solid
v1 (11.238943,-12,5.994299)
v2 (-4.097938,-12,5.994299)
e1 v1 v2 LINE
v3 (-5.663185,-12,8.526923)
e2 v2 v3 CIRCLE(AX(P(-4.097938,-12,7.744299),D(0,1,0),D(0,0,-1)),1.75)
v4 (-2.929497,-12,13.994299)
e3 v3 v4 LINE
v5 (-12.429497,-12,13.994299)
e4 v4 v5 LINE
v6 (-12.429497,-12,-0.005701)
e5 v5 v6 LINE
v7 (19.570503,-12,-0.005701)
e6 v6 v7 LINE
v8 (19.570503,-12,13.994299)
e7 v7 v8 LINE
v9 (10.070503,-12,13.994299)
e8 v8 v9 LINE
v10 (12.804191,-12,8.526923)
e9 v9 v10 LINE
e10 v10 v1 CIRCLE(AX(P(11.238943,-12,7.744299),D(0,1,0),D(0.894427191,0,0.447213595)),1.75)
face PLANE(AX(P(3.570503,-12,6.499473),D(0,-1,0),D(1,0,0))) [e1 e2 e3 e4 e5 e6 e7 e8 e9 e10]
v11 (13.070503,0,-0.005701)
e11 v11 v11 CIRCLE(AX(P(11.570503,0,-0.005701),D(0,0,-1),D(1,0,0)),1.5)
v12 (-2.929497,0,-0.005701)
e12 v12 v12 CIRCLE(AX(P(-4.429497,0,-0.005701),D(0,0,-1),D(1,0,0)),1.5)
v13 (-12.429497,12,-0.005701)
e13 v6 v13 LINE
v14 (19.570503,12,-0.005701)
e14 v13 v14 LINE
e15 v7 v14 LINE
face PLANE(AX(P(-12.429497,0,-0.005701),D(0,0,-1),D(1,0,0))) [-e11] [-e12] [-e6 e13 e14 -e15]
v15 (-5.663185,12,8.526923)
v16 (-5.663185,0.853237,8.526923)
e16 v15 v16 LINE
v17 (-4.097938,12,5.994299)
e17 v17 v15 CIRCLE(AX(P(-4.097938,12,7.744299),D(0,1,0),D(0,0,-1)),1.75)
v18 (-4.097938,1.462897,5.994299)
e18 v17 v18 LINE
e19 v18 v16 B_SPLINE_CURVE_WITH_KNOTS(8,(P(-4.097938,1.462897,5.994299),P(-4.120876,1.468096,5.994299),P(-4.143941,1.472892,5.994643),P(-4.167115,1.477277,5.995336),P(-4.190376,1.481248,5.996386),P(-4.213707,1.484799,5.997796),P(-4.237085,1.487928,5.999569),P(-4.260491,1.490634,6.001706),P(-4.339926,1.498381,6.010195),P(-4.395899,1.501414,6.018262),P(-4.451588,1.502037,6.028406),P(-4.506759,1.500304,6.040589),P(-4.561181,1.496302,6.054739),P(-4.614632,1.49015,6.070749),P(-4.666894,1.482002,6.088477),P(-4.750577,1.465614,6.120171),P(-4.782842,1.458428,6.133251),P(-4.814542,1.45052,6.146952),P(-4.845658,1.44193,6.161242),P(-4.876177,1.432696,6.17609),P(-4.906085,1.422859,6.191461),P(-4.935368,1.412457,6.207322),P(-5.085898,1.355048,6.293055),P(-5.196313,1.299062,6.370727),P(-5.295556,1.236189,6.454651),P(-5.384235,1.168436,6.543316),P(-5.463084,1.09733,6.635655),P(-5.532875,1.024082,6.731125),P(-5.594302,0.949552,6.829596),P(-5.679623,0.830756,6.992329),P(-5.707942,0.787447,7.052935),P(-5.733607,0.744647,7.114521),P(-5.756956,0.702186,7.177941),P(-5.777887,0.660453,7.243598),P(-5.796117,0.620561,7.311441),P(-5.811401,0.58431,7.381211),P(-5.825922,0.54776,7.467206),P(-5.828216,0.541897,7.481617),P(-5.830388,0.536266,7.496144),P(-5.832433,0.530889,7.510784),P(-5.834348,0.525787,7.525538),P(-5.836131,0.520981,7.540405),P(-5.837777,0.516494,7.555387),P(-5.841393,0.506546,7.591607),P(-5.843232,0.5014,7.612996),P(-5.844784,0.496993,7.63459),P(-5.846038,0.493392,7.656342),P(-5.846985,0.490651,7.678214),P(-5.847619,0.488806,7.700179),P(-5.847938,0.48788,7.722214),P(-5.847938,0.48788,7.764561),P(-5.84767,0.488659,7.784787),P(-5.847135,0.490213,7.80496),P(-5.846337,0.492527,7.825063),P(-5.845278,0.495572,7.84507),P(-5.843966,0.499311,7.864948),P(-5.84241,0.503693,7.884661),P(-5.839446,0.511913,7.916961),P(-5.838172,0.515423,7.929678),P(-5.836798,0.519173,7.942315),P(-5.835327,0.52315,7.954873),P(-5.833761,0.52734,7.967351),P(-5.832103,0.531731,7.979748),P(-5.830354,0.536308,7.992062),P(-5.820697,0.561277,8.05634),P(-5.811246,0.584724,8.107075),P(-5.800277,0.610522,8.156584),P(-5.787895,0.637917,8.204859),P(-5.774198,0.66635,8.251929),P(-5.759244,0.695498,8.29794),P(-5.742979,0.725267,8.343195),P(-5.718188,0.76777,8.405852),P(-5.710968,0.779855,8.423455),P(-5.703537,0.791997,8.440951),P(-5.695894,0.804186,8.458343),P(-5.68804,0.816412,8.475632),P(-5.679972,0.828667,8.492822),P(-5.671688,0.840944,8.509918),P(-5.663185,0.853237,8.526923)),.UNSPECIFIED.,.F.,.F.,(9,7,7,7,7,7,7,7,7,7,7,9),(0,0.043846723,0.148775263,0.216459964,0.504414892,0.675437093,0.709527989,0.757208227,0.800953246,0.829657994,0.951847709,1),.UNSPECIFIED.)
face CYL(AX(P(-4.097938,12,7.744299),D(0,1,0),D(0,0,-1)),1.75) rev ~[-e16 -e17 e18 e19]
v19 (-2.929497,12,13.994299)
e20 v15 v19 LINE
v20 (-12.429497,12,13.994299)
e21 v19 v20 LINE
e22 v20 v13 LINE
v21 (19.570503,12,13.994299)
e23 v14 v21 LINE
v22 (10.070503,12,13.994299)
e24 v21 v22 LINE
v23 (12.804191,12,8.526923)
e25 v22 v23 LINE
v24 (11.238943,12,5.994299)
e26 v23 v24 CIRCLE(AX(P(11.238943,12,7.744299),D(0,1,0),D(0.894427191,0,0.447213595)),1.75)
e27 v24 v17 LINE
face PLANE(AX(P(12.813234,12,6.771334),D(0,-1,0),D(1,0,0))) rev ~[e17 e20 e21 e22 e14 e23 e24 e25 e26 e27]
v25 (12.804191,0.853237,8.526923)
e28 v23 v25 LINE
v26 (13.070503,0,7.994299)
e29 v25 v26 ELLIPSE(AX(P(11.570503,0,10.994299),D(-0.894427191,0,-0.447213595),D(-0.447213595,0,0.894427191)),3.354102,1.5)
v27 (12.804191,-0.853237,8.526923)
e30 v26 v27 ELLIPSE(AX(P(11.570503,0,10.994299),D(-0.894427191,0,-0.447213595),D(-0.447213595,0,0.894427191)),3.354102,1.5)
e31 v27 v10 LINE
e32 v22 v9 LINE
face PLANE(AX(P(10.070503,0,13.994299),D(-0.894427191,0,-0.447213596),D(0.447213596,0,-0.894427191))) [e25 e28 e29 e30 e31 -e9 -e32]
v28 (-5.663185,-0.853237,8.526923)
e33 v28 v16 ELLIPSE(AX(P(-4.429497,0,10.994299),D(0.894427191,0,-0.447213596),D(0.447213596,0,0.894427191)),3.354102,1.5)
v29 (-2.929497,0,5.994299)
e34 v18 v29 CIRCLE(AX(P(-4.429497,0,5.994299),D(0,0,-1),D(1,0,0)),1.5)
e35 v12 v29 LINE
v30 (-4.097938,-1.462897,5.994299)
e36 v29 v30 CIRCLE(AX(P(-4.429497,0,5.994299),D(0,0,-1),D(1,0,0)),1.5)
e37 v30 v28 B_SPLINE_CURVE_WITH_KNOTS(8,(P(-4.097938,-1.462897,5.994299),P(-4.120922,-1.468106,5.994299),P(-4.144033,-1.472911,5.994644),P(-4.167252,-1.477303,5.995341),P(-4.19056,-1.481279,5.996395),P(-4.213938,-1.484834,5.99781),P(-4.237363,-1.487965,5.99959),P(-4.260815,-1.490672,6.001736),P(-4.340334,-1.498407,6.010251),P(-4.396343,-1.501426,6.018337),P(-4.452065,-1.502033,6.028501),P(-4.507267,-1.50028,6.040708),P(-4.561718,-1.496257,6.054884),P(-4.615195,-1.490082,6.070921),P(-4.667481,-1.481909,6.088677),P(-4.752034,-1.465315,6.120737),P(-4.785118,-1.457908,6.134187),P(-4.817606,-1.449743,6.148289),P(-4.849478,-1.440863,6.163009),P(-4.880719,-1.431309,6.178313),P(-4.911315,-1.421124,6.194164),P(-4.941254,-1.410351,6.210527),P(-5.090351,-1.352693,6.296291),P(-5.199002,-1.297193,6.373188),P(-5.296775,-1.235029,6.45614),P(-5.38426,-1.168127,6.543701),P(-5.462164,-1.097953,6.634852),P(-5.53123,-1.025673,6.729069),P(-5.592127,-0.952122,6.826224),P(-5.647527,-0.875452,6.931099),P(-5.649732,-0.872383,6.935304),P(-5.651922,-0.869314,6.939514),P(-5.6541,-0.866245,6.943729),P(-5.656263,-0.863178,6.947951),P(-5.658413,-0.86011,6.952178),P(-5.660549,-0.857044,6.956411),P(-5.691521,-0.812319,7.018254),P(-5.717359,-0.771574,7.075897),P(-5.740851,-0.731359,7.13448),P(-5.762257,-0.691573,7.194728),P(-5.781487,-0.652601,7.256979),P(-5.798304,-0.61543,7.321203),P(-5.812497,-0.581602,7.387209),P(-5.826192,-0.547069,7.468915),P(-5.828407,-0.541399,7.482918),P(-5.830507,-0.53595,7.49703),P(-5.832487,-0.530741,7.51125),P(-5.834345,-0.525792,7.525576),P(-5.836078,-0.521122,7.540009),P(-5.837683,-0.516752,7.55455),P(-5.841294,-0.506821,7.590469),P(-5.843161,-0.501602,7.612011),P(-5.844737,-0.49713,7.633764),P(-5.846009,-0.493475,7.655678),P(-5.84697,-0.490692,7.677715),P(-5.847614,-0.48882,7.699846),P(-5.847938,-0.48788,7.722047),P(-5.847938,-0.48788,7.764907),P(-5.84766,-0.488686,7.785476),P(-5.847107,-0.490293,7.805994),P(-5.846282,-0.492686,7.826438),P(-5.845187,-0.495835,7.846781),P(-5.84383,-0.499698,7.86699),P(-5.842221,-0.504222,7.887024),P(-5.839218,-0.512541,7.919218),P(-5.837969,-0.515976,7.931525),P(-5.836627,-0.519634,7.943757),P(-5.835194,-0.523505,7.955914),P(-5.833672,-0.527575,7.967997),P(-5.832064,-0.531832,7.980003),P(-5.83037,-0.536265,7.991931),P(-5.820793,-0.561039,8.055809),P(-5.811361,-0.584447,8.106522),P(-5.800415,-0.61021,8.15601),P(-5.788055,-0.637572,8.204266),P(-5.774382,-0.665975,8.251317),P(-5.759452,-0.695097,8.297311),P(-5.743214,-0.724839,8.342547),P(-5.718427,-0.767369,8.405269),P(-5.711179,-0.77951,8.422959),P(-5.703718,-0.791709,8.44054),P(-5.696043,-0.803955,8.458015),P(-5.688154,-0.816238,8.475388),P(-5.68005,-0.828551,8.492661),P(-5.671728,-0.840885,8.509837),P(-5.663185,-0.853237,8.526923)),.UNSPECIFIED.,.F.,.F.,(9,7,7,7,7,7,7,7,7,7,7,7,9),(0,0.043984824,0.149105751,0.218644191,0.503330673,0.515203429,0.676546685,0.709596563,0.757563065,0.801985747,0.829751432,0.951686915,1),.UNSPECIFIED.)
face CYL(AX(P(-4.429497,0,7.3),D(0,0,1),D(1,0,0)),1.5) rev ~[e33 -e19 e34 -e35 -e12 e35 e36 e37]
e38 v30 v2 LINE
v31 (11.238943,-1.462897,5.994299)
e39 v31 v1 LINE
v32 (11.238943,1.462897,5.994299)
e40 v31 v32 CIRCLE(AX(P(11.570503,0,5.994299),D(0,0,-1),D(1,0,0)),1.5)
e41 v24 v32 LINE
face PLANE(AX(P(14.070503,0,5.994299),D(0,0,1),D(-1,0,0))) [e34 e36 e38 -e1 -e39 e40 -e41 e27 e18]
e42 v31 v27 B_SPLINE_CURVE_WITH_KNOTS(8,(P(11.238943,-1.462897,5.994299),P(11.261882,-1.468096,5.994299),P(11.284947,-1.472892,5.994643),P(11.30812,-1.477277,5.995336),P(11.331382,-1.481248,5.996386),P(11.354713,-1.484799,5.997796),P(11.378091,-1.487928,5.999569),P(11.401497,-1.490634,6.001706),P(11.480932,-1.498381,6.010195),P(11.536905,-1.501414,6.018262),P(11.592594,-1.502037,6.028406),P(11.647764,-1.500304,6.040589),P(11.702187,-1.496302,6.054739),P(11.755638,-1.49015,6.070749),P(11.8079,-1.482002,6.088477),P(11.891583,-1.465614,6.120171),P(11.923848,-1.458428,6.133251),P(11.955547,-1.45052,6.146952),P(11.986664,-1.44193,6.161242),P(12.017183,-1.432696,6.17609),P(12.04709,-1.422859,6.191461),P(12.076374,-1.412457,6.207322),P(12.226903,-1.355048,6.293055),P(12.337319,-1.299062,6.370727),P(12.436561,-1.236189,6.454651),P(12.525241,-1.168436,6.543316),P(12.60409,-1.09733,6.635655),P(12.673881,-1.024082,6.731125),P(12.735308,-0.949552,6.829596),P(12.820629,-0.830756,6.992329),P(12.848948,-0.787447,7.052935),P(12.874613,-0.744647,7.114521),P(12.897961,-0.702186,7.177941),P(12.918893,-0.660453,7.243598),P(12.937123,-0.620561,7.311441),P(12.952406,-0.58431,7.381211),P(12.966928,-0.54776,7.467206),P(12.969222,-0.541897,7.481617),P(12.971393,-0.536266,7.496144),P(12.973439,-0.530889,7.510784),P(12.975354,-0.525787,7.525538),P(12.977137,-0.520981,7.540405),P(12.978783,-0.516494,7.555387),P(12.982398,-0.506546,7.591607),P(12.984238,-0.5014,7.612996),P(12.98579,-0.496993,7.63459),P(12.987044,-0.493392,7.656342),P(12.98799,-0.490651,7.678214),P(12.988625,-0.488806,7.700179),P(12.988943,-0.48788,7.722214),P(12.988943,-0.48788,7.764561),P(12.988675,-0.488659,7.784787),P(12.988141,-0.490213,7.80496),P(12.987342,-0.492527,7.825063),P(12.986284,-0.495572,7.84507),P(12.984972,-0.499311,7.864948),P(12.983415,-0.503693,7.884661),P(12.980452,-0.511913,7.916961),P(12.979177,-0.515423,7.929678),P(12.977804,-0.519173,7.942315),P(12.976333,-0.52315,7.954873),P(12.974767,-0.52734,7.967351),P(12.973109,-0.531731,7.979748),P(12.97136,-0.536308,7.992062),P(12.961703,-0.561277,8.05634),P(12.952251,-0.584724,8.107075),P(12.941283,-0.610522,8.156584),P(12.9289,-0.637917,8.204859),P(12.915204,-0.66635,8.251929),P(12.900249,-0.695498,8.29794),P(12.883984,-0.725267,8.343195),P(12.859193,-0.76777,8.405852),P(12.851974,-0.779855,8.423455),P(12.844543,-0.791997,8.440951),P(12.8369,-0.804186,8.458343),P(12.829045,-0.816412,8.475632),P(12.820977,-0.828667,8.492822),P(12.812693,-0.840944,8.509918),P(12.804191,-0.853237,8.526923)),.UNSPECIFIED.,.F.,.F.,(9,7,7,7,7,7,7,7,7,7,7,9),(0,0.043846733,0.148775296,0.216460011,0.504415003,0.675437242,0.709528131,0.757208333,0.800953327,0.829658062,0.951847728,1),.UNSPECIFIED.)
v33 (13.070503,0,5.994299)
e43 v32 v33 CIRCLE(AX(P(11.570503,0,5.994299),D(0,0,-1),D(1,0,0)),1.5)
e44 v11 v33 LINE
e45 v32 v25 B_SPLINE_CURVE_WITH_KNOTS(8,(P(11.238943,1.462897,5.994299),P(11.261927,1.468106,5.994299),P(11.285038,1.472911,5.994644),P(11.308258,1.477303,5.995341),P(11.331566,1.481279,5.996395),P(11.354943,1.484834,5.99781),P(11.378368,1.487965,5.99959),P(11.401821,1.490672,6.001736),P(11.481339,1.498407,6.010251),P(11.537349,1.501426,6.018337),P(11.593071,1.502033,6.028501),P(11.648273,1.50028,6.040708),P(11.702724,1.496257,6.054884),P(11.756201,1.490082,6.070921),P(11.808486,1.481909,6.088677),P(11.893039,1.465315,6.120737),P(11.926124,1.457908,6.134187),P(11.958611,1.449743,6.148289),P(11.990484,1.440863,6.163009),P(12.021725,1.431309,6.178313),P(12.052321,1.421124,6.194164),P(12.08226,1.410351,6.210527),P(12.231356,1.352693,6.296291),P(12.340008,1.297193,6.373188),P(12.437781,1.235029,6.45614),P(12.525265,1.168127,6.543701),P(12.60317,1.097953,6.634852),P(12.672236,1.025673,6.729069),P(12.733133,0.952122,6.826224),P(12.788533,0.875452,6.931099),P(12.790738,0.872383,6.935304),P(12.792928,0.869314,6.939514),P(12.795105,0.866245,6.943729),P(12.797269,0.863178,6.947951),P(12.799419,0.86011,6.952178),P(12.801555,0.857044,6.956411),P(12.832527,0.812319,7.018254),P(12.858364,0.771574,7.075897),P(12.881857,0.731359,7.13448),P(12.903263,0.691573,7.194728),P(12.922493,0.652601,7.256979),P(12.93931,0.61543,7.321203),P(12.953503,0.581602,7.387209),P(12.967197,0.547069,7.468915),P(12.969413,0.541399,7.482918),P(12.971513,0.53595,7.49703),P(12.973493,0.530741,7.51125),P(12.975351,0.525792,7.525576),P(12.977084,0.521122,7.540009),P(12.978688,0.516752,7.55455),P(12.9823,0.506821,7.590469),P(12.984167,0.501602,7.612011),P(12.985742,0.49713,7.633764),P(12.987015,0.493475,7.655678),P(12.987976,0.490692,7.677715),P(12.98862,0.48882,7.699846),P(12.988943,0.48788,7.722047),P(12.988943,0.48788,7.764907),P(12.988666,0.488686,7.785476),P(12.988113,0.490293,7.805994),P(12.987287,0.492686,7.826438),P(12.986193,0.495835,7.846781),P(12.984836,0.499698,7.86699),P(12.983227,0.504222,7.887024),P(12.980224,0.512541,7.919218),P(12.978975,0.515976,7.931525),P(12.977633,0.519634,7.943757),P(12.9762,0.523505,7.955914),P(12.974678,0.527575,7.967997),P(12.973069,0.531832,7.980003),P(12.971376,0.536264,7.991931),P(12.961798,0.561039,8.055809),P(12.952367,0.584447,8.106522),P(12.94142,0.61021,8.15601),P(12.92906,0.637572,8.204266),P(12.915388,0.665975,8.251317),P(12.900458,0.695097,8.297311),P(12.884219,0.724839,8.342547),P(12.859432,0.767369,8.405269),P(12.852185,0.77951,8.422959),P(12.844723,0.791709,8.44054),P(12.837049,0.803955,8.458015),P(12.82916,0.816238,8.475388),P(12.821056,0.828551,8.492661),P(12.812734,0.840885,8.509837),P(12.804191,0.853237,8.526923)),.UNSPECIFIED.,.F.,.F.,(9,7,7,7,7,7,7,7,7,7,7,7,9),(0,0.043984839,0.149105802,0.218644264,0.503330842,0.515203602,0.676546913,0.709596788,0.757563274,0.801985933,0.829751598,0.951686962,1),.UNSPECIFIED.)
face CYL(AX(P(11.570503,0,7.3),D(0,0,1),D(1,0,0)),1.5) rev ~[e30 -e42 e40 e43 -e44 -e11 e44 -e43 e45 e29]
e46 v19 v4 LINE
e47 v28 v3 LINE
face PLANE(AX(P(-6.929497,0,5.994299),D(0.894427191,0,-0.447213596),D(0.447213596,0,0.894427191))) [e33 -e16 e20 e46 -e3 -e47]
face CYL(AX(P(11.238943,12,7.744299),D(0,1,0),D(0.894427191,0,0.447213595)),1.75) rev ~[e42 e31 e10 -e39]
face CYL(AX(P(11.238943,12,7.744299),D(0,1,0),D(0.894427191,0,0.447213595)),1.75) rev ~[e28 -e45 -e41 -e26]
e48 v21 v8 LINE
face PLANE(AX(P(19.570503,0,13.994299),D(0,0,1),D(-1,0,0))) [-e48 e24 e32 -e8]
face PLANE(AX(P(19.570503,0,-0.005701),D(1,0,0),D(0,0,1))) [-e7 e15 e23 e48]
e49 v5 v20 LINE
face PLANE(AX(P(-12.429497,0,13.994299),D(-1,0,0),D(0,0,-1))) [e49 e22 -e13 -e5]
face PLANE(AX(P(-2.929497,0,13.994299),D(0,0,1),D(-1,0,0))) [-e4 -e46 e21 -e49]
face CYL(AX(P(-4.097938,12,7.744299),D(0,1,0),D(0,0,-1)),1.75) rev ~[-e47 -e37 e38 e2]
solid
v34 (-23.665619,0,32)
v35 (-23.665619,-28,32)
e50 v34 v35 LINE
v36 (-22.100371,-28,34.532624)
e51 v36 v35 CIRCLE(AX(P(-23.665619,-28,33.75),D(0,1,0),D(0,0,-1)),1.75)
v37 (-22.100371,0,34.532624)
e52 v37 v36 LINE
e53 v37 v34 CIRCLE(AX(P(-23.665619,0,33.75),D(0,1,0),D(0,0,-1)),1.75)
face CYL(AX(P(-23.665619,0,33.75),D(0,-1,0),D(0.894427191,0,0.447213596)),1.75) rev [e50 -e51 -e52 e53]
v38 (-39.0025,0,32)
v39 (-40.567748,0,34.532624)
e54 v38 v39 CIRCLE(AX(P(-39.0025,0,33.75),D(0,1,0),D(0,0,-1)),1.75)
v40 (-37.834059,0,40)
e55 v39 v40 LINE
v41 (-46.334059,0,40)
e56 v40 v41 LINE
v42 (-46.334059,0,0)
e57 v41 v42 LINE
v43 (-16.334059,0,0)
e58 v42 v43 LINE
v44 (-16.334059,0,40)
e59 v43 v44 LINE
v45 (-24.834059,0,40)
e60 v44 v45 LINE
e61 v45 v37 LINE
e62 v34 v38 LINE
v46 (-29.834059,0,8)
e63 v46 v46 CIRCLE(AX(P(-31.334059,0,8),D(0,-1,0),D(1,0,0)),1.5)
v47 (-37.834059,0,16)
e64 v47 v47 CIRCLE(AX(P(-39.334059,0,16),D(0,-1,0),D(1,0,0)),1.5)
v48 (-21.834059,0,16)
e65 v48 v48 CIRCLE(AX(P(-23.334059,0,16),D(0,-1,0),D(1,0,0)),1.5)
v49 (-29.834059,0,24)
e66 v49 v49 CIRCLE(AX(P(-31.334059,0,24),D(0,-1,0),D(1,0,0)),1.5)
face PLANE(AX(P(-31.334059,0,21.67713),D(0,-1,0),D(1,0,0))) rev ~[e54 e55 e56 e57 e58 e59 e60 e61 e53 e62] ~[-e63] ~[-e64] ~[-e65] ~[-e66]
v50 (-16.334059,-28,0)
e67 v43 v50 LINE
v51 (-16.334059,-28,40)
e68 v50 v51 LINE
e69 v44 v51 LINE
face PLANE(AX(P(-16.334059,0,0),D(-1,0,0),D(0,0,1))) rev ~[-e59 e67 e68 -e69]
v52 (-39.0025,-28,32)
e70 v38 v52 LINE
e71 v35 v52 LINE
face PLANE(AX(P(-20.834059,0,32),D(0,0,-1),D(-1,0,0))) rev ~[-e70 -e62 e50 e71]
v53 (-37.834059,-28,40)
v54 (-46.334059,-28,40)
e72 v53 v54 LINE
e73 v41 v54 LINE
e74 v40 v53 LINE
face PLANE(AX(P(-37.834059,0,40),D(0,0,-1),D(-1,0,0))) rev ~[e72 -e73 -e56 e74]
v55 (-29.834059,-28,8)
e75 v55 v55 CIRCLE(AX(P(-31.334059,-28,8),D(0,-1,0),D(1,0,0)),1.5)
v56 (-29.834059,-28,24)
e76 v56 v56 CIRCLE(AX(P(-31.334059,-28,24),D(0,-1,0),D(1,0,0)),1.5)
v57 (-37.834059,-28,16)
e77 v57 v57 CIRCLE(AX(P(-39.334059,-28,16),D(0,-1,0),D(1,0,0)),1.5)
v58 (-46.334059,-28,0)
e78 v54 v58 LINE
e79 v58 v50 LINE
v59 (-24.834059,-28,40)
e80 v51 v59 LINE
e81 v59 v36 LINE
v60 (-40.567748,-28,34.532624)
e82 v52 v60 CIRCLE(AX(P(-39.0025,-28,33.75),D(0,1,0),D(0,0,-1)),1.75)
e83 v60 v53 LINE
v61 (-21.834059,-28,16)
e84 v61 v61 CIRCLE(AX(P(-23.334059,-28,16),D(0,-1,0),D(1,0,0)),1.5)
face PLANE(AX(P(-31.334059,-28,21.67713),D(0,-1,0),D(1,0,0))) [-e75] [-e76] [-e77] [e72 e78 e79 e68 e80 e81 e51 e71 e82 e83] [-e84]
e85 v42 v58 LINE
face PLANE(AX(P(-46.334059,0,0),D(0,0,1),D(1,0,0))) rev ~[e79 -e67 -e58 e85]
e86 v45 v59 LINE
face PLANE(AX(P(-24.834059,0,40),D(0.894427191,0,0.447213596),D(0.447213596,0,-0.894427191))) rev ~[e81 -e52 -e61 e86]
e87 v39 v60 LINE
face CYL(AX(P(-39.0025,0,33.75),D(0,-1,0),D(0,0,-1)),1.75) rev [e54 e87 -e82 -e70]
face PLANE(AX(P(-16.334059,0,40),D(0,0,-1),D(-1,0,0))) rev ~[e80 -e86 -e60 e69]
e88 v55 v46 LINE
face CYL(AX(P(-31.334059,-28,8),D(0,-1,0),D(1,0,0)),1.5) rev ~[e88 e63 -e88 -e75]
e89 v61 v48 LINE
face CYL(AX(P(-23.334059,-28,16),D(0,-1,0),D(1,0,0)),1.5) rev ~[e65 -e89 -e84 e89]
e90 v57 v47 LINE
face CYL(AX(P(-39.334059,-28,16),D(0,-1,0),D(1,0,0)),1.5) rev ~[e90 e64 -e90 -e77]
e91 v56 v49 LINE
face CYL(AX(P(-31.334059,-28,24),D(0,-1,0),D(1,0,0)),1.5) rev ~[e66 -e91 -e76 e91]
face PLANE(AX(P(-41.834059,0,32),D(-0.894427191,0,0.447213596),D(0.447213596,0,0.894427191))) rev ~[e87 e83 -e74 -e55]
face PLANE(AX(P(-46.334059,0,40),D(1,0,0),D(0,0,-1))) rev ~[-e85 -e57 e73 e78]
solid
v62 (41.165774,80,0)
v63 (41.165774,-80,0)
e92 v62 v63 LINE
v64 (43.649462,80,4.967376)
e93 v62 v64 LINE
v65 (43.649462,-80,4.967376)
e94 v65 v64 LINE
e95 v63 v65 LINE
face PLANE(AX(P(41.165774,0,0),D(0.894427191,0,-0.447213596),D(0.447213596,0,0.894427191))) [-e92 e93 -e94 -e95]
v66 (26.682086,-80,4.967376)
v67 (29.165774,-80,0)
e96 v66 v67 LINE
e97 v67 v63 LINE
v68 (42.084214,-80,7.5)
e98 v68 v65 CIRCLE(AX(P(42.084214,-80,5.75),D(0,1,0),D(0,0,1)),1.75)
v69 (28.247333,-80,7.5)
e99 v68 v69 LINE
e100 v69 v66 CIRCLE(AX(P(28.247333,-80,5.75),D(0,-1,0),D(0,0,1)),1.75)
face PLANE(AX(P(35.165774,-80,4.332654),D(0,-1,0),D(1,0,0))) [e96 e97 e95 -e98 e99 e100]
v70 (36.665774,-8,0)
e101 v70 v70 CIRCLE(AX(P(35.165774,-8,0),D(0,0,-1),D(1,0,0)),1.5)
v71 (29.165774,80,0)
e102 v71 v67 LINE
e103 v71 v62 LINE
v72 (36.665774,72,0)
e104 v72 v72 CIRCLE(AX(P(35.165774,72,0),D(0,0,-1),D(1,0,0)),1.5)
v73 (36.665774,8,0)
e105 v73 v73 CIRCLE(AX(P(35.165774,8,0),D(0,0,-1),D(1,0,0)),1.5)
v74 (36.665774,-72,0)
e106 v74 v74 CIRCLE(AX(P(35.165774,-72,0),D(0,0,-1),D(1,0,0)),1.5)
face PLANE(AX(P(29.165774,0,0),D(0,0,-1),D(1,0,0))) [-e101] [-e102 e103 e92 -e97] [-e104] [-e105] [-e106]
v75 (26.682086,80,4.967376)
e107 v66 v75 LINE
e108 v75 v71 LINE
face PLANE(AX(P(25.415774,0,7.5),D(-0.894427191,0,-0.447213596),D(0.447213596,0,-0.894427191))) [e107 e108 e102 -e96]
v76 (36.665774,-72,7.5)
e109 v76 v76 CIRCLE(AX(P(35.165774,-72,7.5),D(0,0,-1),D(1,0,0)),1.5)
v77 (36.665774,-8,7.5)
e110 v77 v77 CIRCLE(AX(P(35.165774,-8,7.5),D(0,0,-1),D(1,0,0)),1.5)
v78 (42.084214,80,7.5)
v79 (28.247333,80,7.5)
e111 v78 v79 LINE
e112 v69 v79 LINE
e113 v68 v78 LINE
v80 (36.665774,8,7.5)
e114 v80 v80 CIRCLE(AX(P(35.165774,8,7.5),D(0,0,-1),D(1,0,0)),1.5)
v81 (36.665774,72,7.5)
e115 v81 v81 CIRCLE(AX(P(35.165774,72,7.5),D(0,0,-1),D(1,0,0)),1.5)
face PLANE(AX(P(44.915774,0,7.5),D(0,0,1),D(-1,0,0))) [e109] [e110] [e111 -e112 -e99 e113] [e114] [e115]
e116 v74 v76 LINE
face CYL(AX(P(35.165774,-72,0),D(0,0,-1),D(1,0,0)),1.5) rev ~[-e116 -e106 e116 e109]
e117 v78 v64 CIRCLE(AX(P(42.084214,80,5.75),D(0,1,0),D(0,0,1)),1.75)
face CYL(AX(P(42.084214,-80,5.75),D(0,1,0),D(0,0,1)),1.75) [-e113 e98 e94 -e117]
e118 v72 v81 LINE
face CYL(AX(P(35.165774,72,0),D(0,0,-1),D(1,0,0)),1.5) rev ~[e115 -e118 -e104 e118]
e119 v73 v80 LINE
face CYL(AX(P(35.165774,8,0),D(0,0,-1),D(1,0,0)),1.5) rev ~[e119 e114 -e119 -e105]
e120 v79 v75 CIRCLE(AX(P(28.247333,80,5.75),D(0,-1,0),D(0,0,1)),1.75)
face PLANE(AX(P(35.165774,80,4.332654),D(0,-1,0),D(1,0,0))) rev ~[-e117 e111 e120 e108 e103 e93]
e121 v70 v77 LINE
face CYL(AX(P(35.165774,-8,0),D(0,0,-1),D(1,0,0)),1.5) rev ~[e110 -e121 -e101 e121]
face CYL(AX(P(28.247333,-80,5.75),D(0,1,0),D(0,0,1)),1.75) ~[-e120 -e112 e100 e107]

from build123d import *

# Parameters (mm, degrees)
F1_DEPTH      = 12
F3_DEPTH      = 80
F4_R          = 1.5
F5_DEPTH      = 7
F6_R          = 1.5
F7_DEPTH      = 13.9952990129
F9_DEPTH      = 28
F10_T4_DEPTH  = 24
F10_S5_R      = 1.5
F10_T6_DEPTH  = 14
F10_T10_DEPTH = 24
F10_S11_R     = 1.5
F10_T12_DEPTH = 14
F10_2_F1_R    = 1.75
F10_2_F2_R    = 1.75
F10_3_F1_R    = 1.75
F10_3_F2_R    = 1.75
F11_R         = 1.5
F12_DEPTH     = 108.001


# Not quite as in the source:
# - a fillet or chamfer that OpenCascade refuses, or shapes differently, is made with other operations: its cross-section is extruded or revolved along the edge and cut away or added


with BuildPart() as f1:
    # F0 (on Front) → F1 (new body, symmetric)
    with BuildSketch(Plane.XZ):
        Polygon((19.5705028659, -0.0057009871), (19.5705028659, 13.9942990129), (10.0705028659, 13.9942990129), (14.0705028659, 5.9942990129), (-6.9294971341, 5.9942990129), (-2.9294971341, 13.9942990129), (-12.4294971341, 13.9942990129), (-12.4294971341, -0.0057009871), align=None)
    extrude(amount=F1_DEPTH, both=True)

    # F4 (on face) → F5 (cut)
    with BuildSketch(Plane(origin=(0, 0, -0.0057009871), x_dir=(1, 0, 0), z_dir=(0, 0, -1))):
        with Locations((-4.4294971341, 0)):
            Circle(F4_R)
        with Locations((11.5705028659, 0)):
            Circle(F4_R)
    extrude(amount=-F5_DEPTH, mode=Mode.SUBTRACT)

    # F10: fillet of radius 1.75 on 2 edges, made by hand


with BuildPart() as f3:
    # F2 (on Front) → F3 (new body, symmetric)
    with BuildSketch(Plane.XZ):
        Polygon((25.415773809, 7.5), (29.165773809, 0), (41.165773809, 0), (44.915773809, 7.5), align=None)
    extrude(amount=F3_DEPTH, both=True)

    # F6 (on face) → F7 (cut, through all)
    with BuildSketch(Plane(origin=(0, 0, 0), x_dir=(1, 0, 0), z_dir=(0, 0, -1))):
        with Locations((35.165773809, 72)):
            Circle(F6_R)
        with Locations((35.165773809, -72)):
            Circle(F6_R)
        with Locations((35.165773809, 8)):
            Circle(F6_R)
        with Locations((35.165773809, -8)):
            Circle(F6_R)
    extrude(amount=-F7_DEPTH, mode=Mode.SUBTRACT)

    # F10#2: fillet of radius 1.75 on 2 edges, made by hand

    # F10_2_f1
    f10_2_f1_edges = [f3.edges().sort_by_distance(p)[0] for p in [
        (44.915773809, 0, 7.5),
    ]]
    fillet(f10_2_f1_edges, radius=F10_2_F1_R)

    # F10_2_f2
    f10_2_f2_edges = [f3.edges().sort_by_distance(p)[0] for p in [
        (25.415773809, 0, 7.5),
    ]]
    fillet(f10_2_f2_edges, radius=F10_2_F2_R)


with BuildPart() as f9:
    # F8 (on Front) → F9 (new body)
    with BuildSketch(Plane.XZ):
        Polygon((-46.3340594471, 40), (-46.3340594471, 0), (-16.3340594471, 0), (-16.3340594471, 40), (-24.8340594471, 40), (-20.8340594471, 32), (-41.8340594471, 32), (-37.8340594471, 40), align=None)
    extrude(amount=F9_DEPTH)

    # F10#3: fillet of radius 1.75 on 2 edges, made by hand

    # F10_3_f1
    f10_3_f1_edges = [f9.edges().sort_by_distance(p)[0] for p in [
        (-20.8340594471, -14, 32),
    ]]
    fillet(f10_3_f1_edges, radius=F10_3_F1_R)

    # F10_3_f2
    f10_3_f2_edges = [f9.edges().sort_by_distance(p)[0] for p in [
        (-41.8340594471, -14, 32),
    ]]
    fillet(f10_3_f2_edges, radius=F10_3_F2_R)

    # F11 (on face) → F12 (cut, through all)
    with BuildSketch(Plane.XZ.offset(28)):
        with Locations((-31.3340594471, 24)):
            Circle(F11_R)
        with Locations((-23.3340594471, 16)):
            Circle(F11_R)
        with Locations((-31.3340594471, 8)):
            Circle(F11_R)
        with Locations((-39.3340594471, 16)):
            Circle(F11_R)
    extrude(amount=-F12_DEPTH, mode=Mode.SUBTRACT)


with BuildPart() as f10_tool2:
    # F10_s3 → F10_t4 (new body)
    with BuildSketch(Plane.XZ.offset(-12)):
        with BuildLine():
            ThreePointArc((-4.0979376538, 5.9942990129), (-5.5865765684, 6.8242695667), (-5.663185238, 8.5269228051))
            Line((-5.663185238, 8.5269228051), (-6.9294971341, 5.9942990129))
            Line((-6.9294971341, 5.9942990129), (-4.0979376538, 5.9942990129))
        make_face()
    extrude(amount=F10_T4_DEPTH)

    # F10_s5 → F10_t6 (cut, symmetric)
    with BuildSketch(Plane.XY.offset(7.3)):
        with Locations((-4.4294971341, 0)):
            Circle(F10_S5_R)
    extrude(amount=F10_T6_DEPTH, both=True, mode=Mode.SUBTRACT)


with BuildPart() as f1_1:
    add(f1.part)

    # F10_t1: union F10_tool2
    add(f10_tool2.part)


with BuildPart() as f10_tool8:
    # F10_s9 → F10_t10 (new body)
    with BuildSketch(Plane.XZ.offset(-12)):
        with BuildLine():
            ThreePointArc((12.8041909699, 8.5269228051), (12.7275823002, 6.8242695667), (11.2389433856, 5.9942990129))
            Line((11.2389433856, 5.9942990129), (14.0705028659, 5.9942990129))
            Line((14.0705028659, 5.9942990129), (12.8041909699, 8.5269228051))
        make_face()
    extrude(amount=F10_T10_DEPTH)

    # F10_s11 → F10_t12 (cut, symmetric)
    with BuildSketch(Plane.XY.offset(7.3)):
        with Locations((11.5705028659, 0)):
            Circle(F10_S11_R)
    extrude(amount=F10_T12_DEPTH, both=True, mode=Mode.SUBTRACT)


with BuildPart() as f1_2:
    add(f1_1.part)

    # F10_t7: union F10_tool8
    add(f10_tool8.part)


solid = Compound([f3.part, f9.part, f1_2.part])
